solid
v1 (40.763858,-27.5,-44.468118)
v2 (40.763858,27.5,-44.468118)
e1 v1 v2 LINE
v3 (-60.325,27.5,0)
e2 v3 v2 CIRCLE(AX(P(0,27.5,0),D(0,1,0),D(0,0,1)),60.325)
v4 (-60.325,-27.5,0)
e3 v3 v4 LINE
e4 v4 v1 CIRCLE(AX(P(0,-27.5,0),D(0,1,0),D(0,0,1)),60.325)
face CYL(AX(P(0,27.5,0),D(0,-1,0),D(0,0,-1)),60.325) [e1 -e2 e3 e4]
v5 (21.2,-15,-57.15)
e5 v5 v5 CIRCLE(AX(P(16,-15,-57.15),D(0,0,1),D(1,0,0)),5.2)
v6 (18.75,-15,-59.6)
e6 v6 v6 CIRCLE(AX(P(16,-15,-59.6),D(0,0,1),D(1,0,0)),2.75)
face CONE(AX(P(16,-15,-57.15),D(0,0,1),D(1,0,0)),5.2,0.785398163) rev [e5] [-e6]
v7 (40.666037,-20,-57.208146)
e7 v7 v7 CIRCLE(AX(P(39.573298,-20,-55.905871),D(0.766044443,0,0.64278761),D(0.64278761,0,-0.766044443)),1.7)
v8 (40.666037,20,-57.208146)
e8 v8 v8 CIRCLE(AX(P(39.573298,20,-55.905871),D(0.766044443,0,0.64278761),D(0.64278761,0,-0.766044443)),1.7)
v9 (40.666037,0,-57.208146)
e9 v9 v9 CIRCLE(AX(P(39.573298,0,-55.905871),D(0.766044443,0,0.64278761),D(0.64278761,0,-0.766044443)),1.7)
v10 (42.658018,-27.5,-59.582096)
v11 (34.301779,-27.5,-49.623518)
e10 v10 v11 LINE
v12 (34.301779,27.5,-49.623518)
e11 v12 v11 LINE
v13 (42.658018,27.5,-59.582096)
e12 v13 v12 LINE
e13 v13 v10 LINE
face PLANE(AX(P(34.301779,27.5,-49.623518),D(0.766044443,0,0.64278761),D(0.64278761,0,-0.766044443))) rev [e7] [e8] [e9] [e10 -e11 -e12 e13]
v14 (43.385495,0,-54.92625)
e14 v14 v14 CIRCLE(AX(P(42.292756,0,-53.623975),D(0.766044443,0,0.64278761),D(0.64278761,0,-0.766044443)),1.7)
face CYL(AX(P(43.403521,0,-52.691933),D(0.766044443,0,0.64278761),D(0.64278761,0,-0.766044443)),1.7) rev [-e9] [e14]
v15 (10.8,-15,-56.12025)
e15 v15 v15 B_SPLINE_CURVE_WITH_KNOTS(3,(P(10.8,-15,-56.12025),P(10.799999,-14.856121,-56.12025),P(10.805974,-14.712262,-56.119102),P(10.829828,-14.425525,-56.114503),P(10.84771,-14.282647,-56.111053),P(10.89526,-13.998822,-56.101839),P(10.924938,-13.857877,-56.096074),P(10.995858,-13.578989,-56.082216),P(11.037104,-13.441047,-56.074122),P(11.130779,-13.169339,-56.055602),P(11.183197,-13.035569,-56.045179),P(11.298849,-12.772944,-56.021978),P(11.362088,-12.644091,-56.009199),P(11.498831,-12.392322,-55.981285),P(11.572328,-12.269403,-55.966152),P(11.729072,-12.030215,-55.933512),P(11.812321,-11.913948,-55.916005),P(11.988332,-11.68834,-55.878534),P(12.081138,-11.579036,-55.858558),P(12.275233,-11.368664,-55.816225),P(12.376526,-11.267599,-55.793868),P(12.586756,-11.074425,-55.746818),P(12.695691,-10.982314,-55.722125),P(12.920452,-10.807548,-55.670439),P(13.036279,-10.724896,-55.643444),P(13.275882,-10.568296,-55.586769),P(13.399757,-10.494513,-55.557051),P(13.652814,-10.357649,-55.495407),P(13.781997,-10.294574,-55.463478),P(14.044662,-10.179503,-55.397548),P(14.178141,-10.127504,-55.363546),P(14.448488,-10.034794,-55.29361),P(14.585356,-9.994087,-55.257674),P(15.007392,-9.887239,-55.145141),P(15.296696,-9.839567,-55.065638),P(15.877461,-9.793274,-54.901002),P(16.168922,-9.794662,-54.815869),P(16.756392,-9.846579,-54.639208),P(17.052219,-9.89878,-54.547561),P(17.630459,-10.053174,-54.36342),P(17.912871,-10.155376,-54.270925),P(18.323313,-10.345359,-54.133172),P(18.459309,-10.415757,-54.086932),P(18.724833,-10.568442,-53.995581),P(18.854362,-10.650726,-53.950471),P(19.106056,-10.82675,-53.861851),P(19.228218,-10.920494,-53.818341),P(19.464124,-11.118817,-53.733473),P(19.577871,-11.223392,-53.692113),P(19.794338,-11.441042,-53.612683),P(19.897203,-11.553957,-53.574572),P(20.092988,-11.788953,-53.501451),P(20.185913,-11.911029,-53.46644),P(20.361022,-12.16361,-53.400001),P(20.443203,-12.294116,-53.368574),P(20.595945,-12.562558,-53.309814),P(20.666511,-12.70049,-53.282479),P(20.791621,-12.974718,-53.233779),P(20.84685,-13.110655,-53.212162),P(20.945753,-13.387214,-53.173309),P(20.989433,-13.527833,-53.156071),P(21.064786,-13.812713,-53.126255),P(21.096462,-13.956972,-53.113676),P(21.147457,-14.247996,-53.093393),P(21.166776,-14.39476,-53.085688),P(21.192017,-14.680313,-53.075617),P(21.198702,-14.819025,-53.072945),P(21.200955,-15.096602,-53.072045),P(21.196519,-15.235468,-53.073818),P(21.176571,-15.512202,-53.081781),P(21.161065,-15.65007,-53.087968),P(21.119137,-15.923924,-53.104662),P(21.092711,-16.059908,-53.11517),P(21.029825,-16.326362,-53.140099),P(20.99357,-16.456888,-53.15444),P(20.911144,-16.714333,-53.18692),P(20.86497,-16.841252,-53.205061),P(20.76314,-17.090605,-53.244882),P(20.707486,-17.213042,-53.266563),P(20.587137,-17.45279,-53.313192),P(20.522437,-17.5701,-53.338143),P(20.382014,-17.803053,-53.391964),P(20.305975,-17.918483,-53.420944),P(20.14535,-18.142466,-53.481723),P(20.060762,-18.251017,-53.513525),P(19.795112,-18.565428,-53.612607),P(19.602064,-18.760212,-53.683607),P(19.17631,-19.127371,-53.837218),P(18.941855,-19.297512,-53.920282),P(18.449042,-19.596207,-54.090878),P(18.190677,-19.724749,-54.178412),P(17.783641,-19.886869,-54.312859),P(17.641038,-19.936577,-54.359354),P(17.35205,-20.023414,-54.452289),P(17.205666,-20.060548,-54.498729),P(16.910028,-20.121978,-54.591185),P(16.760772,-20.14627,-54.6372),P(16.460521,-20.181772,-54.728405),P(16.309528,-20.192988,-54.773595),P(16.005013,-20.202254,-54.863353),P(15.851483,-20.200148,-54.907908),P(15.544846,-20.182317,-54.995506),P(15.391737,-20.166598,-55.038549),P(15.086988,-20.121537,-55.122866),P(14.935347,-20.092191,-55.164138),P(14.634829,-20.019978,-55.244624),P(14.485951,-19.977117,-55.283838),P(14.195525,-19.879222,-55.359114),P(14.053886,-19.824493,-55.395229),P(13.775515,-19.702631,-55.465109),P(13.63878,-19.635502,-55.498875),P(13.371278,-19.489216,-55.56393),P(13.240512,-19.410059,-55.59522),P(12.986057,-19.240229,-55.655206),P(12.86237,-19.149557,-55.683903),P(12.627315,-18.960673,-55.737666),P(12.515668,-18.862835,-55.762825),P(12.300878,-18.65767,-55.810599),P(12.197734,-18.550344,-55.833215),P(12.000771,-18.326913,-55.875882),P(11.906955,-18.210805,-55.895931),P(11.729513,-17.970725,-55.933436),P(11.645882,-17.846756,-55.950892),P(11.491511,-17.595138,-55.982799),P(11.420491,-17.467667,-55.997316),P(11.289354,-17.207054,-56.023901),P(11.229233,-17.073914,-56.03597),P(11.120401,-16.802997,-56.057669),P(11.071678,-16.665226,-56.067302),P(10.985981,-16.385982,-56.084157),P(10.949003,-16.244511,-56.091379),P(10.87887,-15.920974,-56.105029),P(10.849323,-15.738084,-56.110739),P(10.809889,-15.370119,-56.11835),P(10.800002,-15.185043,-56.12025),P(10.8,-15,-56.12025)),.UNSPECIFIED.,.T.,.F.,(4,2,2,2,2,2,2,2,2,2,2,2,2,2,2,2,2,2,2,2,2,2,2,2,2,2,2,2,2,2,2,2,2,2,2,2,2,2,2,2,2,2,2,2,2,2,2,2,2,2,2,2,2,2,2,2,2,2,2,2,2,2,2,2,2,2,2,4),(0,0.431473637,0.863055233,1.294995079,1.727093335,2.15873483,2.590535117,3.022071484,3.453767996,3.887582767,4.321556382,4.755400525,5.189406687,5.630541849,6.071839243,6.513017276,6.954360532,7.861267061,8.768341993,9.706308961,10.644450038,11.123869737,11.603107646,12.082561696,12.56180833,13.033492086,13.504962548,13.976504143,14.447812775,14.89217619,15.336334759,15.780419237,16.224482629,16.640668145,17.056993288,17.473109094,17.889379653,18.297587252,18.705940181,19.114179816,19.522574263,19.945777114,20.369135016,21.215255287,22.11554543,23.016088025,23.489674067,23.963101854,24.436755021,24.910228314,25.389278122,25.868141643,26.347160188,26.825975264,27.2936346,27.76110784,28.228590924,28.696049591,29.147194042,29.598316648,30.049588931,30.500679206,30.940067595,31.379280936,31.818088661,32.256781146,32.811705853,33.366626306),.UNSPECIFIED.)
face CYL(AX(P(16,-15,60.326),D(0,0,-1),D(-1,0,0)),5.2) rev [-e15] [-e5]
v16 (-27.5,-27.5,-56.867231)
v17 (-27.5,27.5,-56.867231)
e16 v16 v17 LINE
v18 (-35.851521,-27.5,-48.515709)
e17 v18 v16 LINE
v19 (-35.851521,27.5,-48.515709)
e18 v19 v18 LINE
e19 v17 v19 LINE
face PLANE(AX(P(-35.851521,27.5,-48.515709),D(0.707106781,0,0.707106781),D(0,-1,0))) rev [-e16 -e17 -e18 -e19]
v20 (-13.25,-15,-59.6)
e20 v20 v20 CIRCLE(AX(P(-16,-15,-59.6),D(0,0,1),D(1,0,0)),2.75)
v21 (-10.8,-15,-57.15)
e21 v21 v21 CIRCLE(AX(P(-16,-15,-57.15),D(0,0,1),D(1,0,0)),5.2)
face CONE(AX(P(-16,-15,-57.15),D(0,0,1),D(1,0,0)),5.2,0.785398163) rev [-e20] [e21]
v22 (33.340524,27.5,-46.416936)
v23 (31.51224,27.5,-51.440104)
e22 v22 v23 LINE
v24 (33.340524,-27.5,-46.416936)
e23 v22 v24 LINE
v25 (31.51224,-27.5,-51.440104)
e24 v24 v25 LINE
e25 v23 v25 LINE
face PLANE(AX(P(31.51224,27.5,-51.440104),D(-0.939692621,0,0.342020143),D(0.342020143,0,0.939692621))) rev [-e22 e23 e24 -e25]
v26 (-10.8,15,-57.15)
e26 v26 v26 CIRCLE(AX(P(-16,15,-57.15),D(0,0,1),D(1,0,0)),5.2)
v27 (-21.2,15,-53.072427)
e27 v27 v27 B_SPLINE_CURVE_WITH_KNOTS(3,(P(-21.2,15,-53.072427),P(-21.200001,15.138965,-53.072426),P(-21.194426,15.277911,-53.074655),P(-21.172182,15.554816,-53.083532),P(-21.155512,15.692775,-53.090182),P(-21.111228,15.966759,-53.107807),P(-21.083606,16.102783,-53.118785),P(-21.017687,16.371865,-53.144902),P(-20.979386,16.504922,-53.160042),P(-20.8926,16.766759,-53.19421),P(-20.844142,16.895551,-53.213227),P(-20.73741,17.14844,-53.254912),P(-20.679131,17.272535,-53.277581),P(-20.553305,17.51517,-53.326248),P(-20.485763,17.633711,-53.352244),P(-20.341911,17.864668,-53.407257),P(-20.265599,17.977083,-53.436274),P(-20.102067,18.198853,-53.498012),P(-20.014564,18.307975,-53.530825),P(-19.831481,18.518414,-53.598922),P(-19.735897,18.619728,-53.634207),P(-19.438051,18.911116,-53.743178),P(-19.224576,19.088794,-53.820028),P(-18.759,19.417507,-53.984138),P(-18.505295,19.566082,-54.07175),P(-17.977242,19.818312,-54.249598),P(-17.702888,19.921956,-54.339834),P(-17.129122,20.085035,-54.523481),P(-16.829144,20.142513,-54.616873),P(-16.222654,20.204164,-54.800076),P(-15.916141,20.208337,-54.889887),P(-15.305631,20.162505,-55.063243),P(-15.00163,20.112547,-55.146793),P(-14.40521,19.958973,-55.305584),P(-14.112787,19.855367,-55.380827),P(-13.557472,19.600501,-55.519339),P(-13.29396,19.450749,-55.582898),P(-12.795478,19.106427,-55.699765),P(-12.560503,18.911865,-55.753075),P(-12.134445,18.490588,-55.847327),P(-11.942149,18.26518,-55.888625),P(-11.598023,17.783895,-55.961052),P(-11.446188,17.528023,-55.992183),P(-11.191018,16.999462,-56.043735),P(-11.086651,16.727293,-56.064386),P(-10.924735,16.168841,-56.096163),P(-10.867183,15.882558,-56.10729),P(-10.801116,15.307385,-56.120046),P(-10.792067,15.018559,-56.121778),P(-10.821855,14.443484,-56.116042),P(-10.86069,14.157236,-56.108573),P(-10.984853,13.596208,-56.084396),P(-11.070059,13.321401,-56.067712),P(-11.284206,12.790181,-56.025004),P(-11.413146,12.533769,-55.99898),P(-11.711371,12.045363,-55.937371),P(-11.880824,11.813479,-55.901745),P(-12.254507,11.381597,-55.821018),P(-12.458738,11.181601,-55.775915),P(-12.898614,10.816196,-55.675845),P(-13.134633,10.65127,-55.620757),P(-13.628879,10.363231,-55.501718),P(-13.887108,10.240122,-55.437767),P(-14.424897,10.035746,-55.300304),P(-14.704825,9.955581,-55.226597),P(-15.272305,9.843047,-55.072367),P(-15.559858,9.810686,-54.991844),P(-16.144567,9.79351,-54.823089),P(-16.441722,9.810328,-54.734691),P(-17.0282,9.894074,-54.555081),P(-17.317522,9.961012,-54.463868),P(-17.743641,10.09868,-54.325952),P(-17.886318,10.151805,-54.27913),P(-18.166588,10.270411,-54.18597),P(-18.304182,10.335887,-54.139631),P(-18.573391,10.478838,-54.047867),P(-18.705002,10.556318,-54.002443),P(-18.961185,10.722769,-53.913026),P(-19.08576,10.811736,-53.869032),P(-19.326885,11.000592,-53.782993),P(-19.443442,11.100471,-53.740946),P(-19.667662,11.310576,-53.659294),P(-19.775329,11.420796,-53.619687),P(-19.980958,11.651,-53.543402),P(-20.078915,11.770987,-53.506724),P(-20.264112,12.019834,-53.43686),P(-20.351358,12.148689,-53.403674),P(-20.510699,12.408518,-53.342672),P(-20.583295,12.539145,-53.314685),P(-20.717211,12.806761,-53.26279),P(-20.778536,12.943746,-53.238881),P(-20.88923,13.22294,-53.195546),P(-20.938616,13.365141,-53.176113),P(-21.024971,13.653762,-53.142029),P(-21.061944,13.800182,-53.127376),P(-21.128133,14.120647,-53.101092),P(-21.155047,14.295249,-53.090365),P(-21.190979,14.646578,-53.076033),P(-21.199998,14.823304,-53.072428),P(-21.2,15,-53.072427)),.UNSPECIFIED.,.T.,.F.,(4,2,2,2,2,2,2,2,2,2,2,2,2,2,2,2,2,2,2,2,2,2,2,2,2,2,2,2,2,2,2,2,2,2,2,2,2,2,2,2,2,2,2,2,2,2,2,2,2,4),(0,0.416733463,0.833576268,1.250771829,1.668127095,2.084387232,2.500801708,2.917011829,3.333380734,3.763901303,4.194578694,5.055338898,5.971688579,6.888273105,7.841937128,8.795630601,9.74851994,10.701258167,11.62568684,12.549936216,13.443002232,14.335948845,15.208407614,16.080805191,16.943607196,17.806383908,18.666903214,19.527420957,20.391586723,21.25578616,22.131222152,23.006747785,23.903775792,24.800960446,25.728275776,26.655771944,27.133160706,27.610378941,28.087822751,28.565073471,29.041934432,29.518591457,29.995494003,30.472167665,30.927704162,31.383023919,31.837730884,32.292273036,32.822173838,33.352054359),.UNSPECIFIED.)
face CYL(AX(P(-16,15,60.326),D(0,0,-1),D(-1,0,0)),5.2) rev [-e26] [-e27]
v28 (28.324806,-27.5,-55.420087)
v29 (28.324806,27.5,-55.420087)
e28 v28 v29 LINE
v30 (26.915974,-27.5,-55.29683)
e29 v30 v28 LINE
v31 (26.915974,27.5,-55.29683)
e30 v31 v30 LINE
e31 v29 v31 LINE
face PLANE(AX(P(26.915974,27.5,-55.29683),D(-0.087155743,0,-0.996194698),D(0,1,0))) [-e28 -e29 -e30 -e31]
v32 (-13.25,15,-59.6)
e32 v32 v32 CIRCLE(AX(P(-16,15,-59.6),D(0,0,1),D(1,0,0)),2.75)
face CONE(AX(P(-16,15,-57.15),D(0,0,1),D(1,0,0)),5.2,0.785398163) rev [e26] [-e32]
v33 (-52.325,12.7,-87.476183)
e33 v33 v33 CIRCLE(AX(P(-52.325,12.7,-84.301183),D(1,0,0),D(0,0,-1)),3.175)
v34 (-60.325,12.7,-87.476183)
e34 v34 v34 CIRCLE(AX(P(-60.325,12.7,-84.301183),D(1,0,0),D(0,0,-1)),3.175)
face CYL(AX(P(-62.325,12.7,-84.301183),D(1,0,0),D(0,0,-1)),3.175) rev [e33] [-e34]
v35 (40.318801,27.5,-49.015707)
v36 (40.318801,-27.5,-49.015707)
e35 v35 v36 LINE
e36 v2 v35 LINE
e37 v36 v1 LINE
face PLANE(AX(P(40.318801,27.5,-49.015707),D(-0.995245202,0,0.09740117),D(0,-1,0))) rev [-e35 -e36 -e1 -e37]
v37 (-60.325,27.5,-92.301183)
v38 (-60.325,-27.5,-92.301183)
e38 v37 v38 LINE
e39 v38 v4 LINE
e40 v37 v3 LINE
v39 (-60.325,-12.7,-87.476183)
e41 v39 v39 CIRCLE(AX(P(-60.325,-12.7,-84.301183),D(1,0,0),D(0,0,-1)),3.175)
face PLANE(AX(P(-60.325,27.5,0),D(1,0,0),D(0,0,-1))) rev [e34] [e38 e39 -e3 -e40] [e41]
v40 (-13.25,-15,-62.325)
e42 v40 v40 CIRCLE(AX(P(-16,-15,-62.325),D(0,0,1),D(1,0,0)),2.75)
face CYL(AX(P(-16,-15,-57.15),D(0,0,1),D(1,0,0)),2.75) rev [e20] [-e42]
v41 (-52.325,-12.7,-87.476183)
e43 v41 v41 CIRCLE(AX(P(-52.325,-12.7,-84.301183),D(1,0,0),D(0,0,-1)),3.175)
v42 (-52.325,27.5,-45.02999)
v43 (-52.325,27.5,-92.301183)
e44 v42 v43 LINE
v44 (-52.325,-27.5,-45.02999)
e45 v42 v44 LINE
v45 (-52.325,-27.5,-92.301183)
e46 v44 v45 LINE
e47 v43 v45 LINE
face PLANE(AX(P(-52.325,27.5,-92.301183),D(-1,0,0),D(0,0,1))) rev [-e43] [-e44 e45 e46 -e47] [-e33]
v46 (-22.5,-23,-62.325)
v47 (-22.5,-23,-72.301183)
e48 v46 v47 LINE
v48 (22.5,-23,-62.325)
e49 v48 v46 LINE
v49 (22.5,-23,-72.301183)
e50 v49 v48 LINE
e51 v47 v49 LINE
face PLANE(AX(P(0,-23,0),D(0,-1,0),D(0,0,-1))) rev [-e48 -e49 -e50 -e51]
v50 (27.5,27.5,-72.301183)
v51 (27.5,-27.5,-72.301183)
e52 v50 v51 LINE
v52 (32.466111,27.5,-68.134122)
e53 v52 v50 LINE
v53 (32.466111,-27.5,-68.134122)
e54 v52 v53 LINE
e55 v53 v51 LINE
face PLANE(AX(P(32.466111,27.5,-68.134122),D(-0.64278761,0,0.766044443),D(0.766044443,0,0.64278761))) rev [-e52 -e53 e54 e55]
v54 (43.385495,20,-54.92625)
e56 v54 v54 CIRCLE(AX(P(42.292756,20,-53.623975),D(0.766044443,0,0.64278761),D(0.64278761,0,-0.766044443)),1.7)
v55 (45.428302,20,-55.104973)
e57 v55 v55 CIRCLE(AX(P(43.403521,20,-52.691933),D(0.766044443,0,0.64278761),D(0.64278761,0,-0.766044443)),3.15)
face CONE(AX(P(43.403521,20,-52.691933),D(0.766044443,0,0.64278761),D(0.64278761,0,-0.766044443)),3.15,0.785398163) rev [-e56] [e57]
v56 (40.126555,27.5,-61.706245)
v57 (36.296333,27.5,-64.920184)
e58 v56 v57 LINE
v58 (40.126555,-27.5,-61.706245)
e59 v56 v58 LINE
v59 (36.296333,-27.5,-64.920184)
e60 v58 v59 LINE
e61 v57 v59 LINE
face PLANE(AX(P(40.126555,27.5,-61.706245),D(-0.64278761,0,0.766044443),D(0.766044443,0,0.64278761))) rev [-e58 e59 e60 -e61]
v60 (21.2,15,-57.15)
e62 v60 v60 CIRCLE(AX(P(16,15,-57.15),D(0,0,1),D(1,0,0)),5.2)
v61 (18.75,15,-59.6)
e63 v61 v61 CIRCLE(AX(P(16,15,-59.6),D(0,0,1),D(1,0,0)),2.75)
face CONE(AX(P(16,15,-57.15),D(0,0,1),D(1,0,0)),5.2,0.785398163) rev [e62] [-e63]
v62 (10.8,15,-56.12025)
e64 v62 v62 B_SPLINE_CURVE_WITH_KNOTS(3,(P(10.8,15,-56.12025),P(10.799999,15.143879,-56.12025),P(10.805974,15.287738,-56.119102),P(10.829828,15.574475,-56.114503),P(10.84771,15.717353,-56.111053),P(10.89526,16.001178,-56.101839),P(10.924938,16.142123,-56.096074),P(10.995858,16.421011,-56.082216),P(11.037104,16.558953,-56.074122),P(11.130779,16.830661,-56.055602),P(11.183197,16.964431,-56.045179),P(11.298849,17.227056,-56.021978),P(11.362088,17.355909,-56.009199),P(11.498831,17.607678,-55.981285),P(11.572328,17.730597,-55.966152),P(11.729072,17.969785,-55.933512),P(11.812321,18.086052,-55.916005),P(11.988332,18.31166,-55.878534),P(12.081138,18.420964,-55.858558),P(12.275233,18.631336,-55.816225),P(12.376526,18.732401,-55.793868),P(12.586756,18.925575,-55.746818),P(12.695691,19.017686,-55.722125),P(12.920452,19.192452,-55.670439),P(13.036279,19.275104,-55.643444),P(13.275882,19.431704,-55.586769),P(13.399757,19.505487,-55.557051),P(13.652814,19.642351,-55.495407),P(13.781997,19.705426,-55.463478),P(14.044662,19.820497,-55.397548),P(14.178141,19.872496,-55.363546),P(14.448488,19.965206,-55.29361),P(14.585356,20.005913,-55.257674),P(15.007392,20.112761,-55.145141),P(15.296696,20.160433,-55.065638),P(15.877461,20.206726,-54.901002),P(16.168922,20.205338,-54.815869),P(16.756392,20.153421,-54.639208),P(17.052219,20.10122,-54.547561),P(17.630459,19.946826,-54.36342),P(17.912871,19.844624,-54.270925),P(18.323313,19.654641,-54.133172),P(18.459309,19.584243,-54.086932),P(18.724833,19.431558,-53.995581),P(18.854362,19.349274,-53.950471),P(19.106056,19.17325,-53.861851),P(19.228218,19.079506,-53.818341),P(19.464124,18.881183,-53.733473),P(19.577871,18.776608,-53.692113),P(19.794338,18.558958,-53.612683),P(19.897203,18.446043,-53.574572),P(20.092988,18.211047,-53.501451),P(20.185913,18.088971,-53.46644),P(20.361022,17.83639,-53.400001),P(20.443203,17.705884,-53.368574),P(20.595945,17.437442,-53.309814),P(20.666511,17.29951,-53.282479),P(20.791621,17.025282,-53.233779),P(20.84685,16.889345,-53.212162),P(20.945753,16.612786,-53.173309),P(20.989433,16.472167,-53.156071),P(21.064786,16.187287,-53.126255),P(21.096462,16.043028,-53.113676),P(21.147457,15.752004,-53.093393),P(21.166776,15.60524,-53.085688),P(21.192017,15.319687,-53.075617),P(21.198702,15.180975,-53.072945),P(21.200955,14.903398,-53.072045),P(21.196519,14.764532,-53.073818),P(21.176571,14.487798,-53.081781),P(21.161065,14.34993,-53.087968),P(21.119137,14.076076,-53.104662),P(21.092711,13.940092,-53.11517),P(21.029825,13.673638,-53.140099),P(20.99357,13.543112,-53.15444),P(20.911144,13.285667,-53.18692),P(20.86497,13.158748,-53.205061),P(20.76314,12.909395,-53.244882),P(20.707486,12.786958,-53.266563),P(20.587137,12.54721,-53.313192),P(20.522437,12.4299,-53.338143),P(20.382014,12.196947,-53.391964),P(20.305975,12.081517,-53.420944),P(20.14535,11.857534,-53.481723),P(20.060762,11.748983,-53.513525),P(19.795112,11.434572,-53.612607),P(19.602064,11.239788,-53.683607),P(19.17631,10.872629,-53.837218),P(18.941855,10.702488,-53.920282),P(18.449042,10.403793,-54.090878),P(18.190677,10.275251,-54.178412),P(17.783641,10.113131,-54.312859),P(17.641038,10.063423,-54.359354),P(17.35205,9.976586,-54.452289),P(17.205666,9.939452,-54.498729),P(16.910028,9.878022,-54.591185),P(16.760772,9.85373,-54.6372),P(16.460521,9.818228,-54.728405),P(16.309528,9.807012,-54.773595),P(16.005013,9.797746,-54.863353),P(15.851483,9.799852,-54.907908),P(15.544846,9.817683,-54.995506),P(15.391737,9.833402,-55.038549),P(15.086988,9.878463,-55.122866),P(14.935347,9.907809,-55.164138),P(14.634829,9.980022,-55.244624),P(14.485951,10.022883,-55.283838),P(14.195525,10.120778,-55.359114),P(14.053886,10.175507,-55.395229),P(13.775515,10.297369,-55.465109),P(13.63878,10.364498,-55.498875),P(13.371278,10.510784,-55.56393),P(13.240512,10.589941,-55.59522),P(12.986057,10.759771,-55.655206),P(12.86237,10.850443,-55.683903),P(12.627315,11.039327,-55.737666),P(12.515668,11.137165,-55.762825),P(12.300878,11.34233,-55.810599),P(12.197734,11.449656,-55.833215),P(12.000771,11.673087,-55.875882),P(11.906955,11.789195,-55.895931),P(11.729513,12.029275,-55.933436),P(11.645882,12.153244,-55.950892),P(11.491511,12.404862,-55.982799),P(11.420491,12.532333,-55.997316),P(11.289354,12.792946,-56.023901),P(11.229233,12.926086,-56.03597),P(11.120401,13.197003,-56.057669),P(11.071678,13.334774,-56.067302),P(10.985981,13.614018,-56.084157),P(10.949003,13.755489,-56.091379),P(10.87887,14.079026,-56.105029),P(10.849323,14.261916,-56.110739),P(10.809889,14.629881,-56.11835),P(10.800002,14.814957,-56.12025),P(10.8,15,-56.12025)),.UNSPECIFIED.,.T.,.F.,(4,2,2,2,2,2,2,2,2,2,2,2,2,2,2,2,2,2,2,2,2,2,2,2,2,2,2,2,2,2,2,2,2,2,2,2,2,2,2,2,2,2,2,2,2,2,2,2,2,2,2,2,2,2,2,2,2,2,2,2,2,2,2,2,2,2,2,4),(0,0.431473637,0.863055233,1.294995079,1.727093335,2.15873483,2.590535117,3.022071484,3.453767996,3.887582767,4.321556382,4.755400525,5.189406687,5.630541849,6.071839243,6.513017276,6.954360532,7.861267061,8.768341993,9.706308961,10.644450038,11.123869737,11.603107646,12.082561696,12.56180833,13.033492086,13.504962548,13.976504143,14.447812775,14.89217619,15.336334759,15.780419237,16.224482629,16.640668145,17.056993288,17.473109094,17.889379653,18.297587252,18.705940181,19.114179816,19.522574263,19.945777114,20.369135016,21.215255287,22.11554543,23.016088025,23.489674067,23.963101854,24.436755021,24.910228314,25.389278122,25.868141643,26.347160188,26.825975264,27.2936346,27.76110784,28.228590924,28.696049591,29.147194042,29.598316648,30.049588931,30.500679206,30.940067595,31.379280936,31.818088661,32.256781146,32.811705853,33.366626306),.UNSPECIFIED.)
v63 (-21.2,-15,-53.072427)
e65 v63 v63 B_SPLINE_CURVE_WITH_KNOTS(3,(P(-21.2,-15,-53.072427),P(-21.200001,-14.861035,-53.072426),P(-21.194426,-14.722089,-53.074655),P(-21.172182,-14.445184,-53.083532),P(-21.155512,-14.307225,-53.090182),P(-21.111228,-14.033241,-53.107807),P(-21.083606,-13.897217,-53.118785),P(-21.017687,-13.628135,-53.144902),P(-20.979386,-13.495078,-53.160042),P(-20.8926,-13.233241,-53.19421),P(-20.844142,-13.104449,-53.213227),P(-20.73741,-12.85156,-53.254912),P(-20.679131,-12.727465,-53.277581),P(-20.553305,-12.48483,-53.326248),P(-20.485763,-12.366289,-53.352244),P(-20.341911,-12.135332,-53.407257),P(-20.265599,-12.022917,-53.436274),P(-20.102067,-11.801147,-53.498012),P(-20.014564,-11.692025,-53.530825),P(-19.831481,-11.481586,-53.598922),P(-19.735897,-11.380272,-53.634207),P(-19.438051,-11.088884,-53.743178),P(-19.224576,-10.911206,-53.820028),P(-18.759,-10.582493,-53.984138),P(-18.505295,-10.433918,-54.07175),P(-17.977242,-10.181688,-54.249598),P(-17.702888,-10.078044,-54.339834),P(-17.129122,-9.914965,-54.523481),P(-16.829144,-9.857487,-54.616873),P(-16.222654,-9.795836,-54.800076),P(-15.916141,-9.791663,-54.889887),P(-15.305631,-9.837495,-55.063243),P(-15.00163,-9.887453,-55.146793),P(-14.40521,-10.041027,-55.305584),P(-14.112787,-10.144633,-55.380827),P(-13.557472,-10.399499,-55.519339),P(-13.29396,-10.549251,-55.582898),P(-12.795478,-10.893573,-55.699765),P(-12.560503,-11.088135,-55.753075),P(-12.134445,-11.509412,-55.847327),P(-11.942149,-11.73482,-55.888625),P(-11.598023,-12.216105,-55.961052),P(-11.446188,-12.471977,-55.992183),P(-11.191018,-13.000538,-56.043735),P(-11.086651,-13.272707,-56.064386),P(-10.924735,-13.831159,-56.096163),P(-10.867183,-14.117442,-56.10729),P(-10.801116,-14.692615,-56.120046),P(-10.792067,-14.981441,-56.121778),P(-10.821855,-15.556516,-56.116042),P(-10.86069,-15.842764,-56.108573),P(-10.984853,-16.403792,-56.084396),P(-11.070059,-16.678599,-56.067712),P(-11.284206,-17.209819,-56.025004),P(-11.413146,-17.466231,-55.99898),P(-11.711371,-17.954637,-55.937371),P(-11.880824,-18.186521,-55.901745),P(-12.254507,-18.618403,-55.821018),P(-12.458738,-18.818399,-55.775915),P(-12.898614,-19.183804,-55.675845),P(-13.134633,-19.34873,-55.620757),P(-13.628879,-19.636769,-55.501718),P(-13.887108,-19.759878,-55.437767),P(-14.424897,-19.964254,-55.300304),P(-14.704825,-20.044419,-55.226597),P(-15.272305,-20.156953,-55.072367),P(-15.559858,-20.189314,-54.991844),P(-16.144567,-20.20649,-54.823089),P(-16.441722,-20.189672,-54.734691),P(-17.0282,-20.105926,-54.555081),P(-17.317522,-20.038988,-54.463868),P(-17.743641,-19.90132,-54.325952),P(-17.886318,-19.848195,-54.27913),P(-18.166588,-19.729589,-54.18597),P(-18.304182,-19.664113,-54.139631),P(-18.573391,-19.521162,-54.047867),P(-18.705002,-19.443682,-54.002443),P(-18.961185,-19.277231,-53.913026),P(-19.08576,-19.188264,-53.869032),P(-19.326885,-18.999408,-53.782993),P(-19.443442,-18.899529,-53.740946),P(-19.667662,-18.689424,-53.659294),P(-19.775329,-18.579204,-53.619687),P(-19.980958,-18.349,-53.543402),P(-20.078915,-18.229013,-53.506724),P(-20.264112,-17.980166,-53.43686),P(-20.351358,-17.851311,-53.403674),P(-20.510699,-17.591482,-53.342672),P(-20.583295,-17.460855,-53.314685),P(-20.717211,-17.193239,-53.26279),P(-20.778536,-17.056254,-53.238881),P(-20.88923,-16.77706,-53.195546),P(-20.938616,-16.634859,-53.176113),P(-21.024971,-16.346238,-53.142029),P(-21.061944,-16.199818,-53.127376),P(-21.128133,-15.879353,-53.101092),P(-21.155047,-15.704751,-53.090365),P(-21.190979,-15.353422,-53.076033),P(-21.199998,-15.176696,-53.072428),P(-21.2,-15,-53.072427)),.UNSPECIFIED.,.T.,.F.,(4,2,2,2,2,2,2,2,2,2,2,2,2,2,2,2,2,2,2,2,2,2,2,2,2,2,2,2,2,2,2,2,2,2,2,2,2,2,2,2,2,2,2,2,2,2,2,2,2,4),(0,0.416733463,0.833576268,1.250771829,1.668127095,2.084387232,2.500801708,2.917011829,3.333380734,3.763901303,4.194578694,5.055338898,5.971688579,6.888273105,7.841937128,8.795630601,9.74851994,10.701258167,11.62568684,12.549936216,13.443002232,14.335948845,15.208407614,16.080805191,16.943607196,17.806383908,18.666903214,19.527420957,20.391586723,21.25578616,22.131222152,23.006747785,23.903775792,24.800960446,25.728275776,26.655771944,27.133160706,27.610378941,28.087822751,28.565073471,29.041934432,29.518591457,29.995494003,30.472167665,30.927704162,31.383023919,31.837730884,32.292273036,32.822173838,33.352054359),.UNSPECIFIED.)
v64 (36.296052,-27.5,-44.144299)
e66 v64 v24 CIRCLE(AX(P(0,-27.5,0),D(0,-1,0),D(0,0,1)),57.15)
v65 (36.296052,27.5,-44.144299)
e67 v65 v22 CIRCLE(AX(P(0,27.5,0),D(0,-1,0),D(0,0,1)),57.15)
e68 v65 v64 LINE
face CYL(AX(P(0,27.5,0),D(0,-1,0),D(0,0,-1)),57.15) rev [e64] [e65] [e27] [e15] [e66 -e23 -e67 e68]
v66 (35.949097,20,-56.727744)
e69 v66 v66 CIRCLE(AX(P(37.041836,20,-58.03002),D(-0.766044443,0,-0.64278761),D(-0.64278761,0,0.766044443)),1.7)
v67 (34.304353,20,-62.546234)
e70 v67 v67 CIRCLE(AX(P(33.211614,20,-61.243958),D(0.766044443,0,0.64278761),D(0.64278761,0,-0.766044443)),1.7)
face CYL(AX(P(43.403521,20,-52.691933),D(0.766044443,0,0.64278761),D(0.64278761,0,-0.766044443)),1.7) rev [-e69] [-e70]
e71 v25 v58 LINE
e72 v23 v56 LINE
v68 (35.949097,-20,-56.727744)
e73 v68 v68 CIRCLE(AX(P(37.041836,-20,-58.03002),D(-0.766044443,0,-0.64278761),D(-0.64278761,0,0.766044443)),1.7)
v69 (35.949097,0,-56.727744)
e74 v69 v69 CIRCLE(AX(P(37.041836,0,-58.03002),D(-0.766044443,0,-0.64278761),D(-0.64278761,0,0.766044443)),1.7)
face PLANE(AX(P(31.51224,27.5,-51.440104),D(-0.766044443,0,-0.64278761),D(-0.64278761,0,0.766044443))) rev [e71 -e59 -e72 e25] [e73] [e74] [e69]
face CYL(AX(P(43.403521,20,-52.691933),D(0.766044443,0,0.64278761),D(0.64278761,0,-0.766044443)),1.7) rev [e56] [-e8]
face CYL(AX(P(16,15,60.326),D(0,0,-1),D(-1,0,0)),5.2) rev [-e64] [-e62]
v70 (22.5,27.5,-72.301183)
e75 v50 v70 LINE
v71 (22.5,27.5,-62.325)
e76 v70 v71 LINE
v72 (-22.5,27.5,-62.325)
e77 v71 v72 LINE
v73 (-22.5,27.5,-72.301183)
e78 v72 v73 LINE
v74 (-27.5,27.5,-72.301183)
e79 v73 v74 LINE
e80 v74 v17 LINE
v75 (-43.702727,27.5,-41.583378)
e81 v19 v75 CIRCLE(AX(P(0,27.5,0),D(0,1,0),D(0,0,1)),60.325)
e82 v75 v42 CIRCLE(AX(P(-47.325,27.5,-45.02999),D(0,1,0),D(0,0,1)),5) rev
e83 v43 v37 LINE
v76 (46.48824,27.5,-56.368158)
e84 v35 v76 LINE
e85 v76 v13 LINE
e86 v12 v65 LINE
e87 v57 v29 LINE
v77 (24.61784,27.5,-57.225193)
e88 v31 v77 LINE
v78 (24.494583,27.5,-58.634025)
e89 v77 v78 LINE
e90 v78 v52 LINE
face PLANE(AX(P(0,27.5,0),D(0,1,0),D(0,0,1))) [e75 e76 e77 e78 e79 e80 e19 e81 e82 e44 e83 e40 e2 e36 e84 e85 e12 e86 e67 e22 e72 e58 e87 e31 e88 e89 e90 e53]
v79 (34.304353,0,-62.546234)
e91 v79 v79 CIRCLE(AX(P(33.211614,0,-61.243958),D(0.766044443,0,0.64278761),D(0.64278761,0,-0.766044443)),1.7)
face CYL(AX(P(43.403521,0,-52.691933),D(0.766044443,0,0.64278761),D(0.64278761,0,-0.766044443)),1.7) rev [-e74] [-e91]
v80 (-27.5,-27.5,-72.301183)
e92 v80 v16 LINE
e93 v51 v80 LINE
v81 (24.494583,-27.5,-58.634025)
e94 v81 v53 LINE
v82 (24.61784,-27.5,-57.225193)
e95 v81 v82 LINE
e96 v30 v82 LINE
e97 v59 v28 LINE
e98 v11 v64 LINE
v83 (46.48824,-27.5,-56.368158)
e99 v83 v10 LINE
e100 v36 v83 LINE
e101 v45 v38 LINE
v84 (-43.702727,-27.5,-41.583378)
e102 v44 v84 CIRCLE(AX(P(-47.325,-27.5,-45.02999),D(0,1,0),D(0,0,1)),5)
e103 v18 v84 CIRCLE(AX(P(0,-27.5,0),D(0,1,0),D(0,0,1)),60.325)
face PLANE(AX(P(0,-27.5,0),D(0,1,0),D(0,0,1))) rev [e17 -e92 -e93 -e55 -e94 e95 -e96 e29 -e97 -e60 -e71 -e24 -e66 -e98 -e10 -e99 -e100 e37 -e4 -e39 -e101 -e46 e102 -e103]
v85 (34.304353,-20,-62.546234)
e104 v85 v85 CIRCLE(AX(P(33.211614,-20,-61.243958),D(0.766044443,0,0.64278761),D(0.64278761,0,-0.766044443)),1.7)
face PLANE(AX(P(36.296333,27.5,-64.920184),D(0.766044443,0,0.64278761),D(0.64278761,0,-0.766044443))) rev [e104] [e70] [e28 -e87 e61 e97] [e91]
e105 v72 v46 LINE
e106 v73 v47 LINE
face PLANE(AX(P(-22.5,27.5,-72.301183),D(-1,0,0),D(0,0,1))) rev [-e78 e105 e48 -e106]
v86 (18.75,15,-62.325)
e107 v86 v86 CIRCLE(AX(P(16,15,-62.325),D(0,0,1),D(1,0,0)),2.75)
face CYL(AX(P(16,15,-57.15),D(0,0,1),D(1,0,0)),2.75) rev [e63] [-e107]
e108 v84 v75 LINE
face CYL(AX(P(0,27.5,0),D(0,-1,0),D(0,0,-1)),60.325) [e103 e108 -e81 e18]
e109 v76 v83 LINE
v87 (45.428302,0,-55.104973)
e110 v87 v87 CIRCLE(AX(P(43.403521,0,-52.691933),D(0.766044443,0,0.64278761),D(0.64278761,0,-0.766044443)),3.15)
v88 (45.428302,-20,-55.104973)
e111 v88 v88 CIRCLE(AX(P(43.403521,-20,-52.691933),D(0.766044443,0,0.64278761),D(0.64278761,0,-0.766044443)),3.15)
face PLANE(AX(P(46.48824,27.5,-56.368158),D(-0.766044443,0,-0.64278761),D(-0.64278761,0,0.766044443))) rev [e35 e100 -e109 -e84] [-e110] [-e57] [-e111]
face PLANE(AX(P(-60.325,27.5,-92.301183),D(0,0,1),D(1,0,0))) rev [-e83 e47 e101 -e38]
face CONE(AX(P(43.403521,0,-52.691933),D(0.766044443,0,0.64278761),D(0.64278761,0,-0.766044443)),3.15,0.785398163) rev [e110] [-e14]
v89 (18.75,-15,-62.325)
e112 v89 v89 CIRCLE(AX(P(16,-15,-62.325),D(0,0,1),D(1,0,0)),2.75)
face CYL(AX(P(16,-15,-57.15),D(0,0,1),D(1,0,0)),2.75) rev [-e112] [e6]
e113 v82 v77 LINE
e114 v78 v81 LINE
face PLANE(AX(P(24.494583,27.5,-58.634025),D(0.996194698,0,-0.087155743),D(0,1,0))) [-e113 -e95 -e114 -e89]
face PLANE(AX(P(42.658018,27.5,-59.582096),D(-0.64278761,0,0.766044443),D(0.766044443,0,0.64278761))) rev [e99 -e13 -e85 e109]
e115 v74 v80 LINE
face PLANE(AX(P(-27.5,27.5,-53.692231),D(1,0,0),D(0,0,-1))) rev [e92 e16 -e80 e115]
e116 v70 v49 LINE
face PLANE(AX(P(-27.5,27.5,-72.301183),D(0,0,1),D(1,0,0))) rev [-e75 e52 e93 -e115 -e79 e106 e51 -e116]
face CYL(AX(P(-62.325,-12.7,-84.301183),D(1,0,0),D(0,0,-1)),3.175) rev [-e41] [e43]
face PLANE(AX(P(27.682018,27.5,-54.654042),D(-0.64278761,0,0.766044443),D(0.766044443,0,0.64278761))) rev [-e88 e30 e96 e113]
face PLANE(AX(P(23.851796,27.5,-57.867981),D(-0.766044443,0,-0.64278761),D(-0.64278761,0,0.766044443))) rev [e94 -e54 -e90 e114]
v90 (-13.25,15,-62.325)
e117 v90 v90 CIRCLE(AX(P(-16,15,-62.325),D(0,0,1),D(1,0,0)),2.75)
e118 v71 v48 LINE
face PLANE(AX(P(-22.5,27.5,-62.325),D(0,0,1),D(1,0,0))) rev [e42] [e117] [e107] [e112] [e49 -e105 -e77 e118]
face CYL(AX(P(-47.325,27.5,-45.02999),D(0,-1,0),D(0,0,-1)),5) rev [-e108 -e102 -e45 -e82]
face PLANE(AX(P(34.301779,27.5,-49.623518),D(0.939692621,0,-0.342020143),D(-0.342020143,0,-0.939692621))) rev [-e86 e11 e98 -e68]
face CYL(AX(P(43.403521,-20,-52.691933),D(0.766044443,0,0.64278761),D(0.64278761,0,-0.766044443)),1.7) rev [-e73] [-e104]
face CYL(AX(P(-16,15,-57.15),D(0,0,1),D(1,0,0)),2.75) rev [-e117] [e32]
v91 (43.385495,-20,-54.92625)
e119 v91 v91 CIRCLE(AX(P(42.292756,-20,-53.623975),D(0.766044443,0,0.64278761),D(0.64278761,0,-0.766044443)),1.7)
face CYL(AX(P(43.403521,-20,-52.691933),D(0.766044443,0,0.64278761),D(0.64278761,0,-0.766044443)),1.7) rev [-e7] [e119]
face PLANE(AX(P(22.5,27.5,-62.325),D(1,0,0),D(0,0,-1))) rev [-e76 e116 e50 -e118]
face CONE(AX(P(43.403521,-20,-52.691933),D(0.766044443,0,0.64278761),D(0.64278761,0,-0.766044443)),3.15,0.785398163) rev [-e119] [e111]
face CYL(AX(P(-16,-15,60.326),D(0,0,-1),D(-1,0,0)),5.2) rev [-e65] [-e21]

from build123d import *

# Parameters (mm, degrees)
BOSS_EXTRUDE1_DEPTH                             = 27.5
SKETCH4_W                                       = 45
SKETCH4_H                                       = 9.976183447
BOSS_EXTRUDE2_DEPTH                             = 4.5
CSK_FOR_M5_FLAT_HEAD_MACHINE_SCREW1_AT_2_COUNT  = 2
CSK_FOR_M5_FLAT_HEAD_MACHINE_SCREW1_AT_2_PITCH  = 32
CSK_FOR_M5_FLAT_HEAD_MACHINE_SCREW1_AT_3_COUNT  = 2
CSK_FOR_M5_FLAT_HEAD_MACHINE_SCREW1_AT_3_PITCH  = 43.863424399
CSK_FOR_M5_FLAT_HEAD_MACHINE_SCREW1_AT_4_COUNT  = 2
CSK_FOR_M5_FLAT_HEAD_MACHINE_SCREW1_AT_4_PITCH  = 30
CUT_EXTRUDE1_REACH                              = 136.892
CUT_EXTRUDE1_END_RADIUS                         = 57.15
SKETCH13_R                                      = 5.2
CHAMFER1_SIZE                                   = 3.142829186
CHAMFER1_SIZE_2                                 = 3.175
CHAMFER2_SIZE                                   = 1
CSK_FOR_M3_FLAT_HEAD_MACHINE_SCREW1_D           = 3.4
CSK_FOR_M3_FLAT_HEAD_MACHINE_SCREW1_DEPTH       = 15
CSK_FOR_M3_FLAT_HEAD_MACHINE_SCREW1_CSINK_D     = 6.3
CSK_FOR_M3_FLAT_HEAD_MACHINE_SCREW1_CSINK_ANGLE = 90
CSK_FOR_M3_FLAT_HEAD_MACHINE_SCREW1_TIP         = 1.021463052
FILLET2_R                                       = 5
SKETCH14_R                                      = 3.175
CUT_EXTRUDE2_DEPTH                              = 10


with BuildPart() as part:
    # Sketch1 → Boss-Extrude1 (new, symmetric)
    with BuildSketch(Plane(origin=(0, 0, 0), x_dir=(1, 0, 0), z_dir=(0, 1, 0))):
        with BuildLine():
            Line((-27.5, 53.692230583), (-27.5, 72.301183447))
            Line((-27.5, 72.301183447), (-22.5, 72.301183447))
            Line((-22.5, 72.301183447), (-22.5, 62.325))
            Line((-22.5, 62.325), (22.5, 62.325))
            Line((22.5, 62.325), (22.5, 72.301183447))
            Line((22.5, 72.301183447), (27.5, 72.301183447))
            Line((27.5, 72.301183447), (32.466110956, 68.134121575))
            Line((32.466110956, 68.134121575), (23.851795776, 57.867980511))
            Line((23.851795776, 57.867980511), (27.682017991, 54.654042463))
            Line((27.682017991, 54.654042463), (36.296333172, 64.920183527))
            Line((36.296333172, 64.920183527), (40.126555387, 61.706245479))
            Line((40.126555387, 61.706245479), (31.512240207, 51.440104414))
            Line((31.512240207, 51.440104414), (33.340523926, 46.41693618))
            ThreePointArc((33.340523926, 46.41693618), (-34.836825197, -45.304725032), (36.296051801, 44.144298881))
            Line((36.296051801, 44.144298881), (34.301778965, 49.623518465))
            Line((34.301778965, 49.623518465), (42.658017891, 59.582096225))
            Line((42.658017891, 59.582096225), (46.488240107, 56.368158177))
            Line((46.488240107, 56.368158177), (38.298629476, 46.608160286))
            ThreePointArc((38.298629476, 46.608160286), (25.775383623, -54.541133322), (-60.325, 0))
            Line((-60.325, 0), (-60.325, 92.301183447))
            Line((-60.325, 92.301183447), (-52.325, 92.301183447))
            Line((-52.325, 92.301183447), (-52.325, 30.019993338))
            ThreePointArc((-52.325, 30.019993338), (-41.63053399, 43.657808748), (-27.5, 53.692230583))
        make_face()
    extrude(amount=BOSS_EXTRUDE1_DEPTH, both=True)

    # Sketch4 → Boss-Extrude2 (add)
    with BuildSketch(Plane.XZ.offset(27.5)):
        with Locations((0, -67.313091724)):
            Rectangle(SKETCH4_W, SKETCH4_H)
    extrude(amount=-BOSS_EXTRUDE2_DEPTH)

    # Sketch12 → CSK for M5 Flat Head Machine Screw1 (revolve, cut)
    with BuildSketch(Plane(origin=(-16, 15, -57.15), x_dir=(0, -1, 0), z_dir=(1, 0, 0))):
        Polygon((0, 0), (0, 35.151183447), (2.75, 35.151183447), (2.75, 2.45), (5.2, 0), align=None)
    csk_for_m5_flat_head_machine_screw1 = revolve(axis=Axis((-16, 15, -50.8), (0, 0, -1)), mode=Mode.SUBTRACT)

    # CSK for M5 Flat Head Machine Screw1 at 2: CSK for M5 Flat Head Machine Screw1 ×2
    with Locations(*[(i * CSK_FOR_M5_FLAT_HEAD_MACHINE_SCREW1_AT_2_PITCH, 0, 0) for i in range(1, CSK_FOR_M5_FLAT_HEAD_MACHINE_SCREW1_AT_2_COUNT)]):
        add(csk_for_m5_flat_head_machine_screw1, mode=Mode.SUBTRACT)

    # CSK for M5 Flat Head Machine Screw1 at 3: CSK for M5 Flat Head Machine Screw1 ×2
    with Locations(*[Vector(0.7295372041400852, -0.6839411288813297, 0) * (i * CSK_FOR_M5_FLAT_HEAD_MACHINE_SCREW1_AT_3_PITCH) for i in range(1, CSK_FOR_M5_FLAT_HEAD_MACHINE_SCREW1_AT_3_COUNT)]):
        add(csk_for_m5_flat_head_machine_screw1, mode=Mode.SUBTRACT)

    # CSK for M5 Flat Head Machine Screw1 at 4: CSK for M5 Flat Head Machine Screw1 ×2
    with Locations(*[(0, -i * CSK_FOR_M5_FLAT_HEAD_MACHINE_SCREW1_AT_4_PITCH, 0) for i in range(1, CSK_FOR_M5_FLAT_HEAD_MACHINE_SCREW1_AT_4_COUNT)]):
        add(csk_for_m5_flat_head_machine_screw1, mode=Mode.SUBTRACT)

    # Cut-Extrude1: up to this cylinder (the profile starts outside it)
    cut_extrude1_end = Plane(origin=(0, 0, 0), z_dir=(0, -1, 0)) * Cylinder(CUT_EXTRUDE1_END_RADIUS, 419.084, mode=Mode.PRIVATE)
    # Sketch13 → Cut-Extrude1 (cut, up to the surface)
    with BuildSketch(Plane.XY.offset(-57.15), mode=Mode.PRIVATE) as cut_extrude1_sk1:
        with Locations(Location((-16, -15, 0), (0, 0, 180))):
            Circle(SKETCH13_R)
    cut_extrude1_tool1 = extrude(cut_extrude1_sk1.sketch, amount=CUT_EXTRUDE1_REACH, mode=Mode.PRIVATE) - cut_extrude1_end
    add(cut_extrude1_tool1.solids().sort_by_distance((-16, -15, -57.15))[0], mode=Mode.SUBTRACT)
    # Sketch13 → Cut-Extrude1 (cut, up to the surface)
    with BuildSketch(Plane.XY.offset(-57.15), mode=Mode.PRIVATE) as cut_extrude1_sk2:
        with Locations(Location((16, -15, 0), (0, 0, 180))):
            Circle(SKETCH13_R)
    cut_extrude1_tool2 = extrude(cut_extrude1_sk2.sketch, amount=CUT_EXTRUDE1_REACH, mode=Mode.PRIVATE) - cut_extrude1_end
    add(cut_extrude1_tool2.solids().sort_by_distance((16, -15, -57.15))[0], mode=Mode.SUBTRACT)
    # Sketch13 → Cut-Extrude1 (cut, up to the surface)
    with BuildSketch(Plane.XY.offset(-57.15), mode=Mode.PRIVATE) as cut_extrude1_sk3:
        with Locations(Location((16, 15, 0), (0, 0, 180))):
            Circle(SKETCH13_R)
    cut_extrude1_tool3 = extrude(cut_extrude1_sk3.sketch, amount=CUT_EXTRUDE1_REACH, mode=Mode.PRIVATE) - cut_extrude1_end
    add(cut_extrude1_tool3.solids().sort_by_distance((16, 15, -57.15))[0], mode=Mode.SUBTRACT)
    # Sketch13 → Cut-Extrude1 (cut, up to the surface)
    with BuildSketch(Plane.XY.offset(-57.15), mode=Mode.PRIVATE) as cut_extrude1_sk4:
        with Locations(Location((-16, 15, 0), (0, 0, 180))):
            Circle(SKETCH13_R)
    cut_extrude1_tool4 = extrude(cut_extrude1_sk4.sketch, amount=CUT_EXTRUDE1_REACH, mode=Mode.PRIVATE) - cut_extrude1_end
    add(cut_extrude1_tool4.solids().sort_by_distance((-16, 15, -57.15))[0], mode=Mode.SUBTRACT)

    # Chamfer1
    # the kernel refuses this chamfer: 7.31254539, 3.175, 3.142829186 mm, written as the material it adds along each edge
    with BuildSketch(Plane(origin=(38.298629476, 27.5, -46.608160286), x_dir=(0.6427876096865355, 0, -0.7660444431189813), z_dir=(0, -1, 0))) as chamfer1_piece_1:
        with BuildLine():
            Line((CHAMFER1_SIZE, 0), (-0.054749246, 3.264067078))
            ThreePointArc((-0.054749246, 3.264067078), (-0.006082575, 1.678547233), (0, 0))
            Line((0, 0), (CHAMFER1_SIZE, 0))
        make_face()
    extrude(amount=55)
    with BuildSketch(Plane(origin=(-27.5, -27.5, -53.692230583), x_dir=(0, 0, -1), z_dir=(0, 1, 0))) as chamfer1_piece_2:
        with BuildLine():
            Line((CHAMFER1_SIZE_2, 0), (-5.17652137, 8.35152137))
            ThreePointArc((-5.17652137, 8.35152137), (-2.493388985, 4.40273098), (0, 0))
            Line((0, 0), (CHAMFER1_SIZE_2, 0))
        make_face()
    extrude(amount=55)

    # Chamfer2
    chamfer2_edges = [part.edges().sort_by_distance(p)[0] for p in [
        (23.851795776, 0, -57.867980511),
        (27.682017991, 0, -54.654042463),
    ]]
    chamfer(chamfer2_edges, length=CHAMFER2_SIZE)

    # CSK for M3 Flat Head Machine Screw1
    with Locations(Plane(origin=(-0.475480456, 0, -0.398975475), x_dir=(0.6427876096865344, 0, -0.7660444431189822), z_dir=(0.7660444431189822, 0, 0.6427876096865344))):
        with Locations((68.263607475, 20), (68.263607475, 0), (68.263607475, -20)):
            CounterSinkHole(CSK_FOR_M3_FLAT_HEAD_MACHINE_SCREW1_D / 2, CSK_FOR_M3_FLAT_HEAD_MACHINE_SCREW1_CSINK_D / 2, depth=CSK_FOR_M3_FLAT_HEAD_MACHINE_SCREW1_DEPTH, counter_sink_angle=CSK_FOR_M3_FLAT_HEAD_MACHINE_SCREW1_CSINK_ANGLE)
            with Locations((0, 0, -(CSK_FOR_M3_FLAT_HEAD_MACHINE_SCREW1_DEPTH + CSK_FOR_M3_FLAT_HEAD_MACHINE_SCREW1_TIP / 2))):  # 118° drill point
                Cone(0, CSK_FOR_M3_FLAT_HEAD_MACHINE_SCREW1_D / 2, CSK_FOR_M3_FLAT_HEAD_MACHINE_SCREW1_TIP, mode=Mode.SUBTRACT)

    # Fillet2
    fillet2_edges = [part.edges().sort_by_distance(p)[0] for p in [
        (-52.325, 0, -30.019993338),
    ]]
    fillet(fillet2_edges, radius=FILLET2_R)

    # Sketch14 → Cut-Extrude2 (cut)
    with BuildSketch(Plane(origin=(-52.325, 0, 0), x_dir=(0, 0, -1), z_dir=(1, 0, 0))):
        with Locations((84.301183447, 12.7)):
            Circle(SKETCH14_R)
        with Locations((84.301183447, -12.7)):
            Circle(SKETCH14_R)
    extrude(amount=-CUT_EXTRUDE2_DEPTH, mode=Mode.SUBTRACT)


solid = part.part
